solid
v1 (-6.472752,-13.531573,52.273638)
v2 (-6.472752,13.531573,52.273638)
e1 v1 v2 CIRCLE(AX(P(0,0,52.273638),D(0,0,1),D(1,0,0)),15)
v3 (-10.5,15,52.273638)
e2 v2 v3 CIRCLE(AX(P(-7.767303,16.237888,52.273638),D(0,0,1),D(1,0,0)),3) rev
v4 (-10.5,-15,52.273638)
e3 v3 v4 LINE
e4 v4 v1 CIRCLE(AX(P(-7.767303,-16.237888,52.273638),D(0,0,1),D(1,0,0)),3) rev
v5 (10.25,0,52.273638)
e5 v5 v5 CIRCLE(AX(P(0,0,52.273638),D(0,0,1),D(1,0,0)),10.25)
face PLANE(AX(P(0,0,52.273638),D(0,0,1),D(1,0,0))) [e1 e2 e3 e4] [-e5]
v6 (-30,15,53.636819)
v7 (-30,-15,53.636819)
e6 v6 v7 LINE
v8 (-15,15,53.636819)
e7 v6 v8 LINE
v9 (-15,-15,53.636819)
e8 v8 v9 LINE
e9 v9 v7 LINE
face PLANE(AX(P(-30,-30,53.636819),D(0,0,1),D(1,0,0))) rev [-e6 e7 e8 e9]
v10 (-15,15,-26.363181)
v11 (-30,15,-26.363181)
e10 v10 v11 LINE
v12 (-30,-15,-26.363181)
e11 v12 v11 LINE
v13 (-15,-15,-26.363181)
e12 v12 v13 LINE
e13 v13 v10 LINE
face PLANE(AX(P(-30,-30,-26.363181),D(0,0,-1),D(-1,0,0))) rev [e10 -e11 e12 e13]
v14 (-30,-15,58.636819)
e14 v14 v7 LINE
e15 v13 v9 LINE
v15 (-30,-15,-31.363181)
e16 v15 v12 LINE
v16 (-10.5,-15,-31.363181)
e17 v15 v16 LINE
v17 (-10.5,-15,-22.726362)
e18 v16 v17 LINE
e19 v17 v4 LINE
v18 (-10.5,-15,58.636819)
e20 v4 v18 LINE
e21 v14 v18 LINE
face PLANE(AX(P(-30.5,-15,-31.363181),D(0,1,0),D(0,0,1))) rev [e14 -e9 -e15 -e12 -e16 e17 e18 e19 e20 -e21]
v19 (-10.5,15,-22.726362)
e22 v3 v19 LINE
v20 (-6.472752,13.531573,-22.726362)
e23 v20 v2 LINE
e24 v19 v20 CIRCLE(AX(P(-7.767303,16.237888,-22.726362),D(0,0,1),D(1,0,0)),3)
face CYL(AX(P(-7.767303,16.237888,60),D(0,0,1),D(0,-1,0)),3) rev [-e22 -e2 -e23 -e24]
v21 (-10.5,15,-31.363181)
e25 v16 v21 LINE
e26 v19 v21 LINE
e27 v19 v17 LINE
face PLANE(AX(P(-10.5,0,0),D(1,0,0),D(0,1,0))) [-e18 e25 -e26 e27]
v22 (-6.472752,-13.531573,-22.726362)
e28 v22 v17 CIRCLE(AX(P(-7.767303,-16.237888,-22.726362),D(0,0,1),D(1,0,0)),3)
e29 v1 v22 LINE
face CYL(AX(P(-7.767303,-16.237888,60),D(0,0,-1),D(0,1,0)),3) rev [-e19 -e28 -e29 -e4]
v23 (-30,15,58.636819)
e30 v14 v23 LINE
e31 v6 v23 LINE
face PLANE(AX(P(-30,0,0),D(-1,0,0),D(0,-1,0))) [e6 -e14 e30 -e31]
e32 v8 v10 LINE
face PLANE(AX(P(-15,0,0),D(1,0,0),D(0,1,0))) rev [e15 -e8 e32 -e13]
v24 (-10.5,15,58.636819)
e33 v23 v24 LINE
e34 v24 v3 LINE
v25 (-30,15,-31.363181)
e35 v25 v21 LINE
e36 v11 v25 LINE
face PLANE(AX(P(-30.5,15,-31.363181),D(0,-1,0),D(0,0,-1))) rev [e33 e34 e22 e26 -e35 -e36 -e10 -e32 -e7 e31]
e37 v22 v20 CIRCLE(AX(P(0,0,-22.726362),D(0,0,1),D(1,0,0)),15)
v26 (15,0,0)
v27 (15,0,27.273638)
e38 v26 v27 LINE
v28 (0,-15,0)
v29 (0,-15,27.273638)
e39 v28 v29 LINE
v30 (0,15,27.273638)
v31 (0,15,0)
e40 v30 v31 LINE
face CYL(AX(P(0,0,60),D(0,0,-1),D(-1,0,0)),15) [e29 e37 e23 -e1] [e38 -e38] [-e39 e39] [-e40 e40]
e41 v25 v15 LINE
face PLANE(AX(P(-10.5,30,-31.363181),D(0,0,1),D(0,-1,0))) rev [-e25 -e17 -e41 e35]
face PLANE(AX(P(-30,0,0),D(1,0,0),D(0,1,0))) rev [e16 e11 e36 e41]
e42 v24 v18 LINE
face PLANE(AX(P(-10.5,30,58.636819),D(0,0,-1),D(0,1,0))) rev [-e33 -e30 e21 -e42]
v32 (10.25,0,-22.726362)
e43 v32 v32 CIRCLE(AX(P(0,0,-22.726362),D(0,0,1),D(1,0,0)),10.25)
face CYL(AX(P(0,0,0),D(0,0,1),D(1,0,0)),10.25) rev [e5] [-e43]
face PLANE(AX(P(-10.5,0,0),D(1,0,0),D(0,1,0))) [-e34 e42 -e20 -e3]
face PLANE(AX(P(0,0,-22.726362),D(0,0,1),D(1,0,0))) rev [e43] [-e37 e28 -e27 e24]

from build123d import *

# Parameters (mm, degrees)
SKETCH_1_W            = 30
SKETCH_1_H            = 30
SKETCH_1_R            = 9.807439468
EXTRUDE_1_DEPTH       = 60
SKETCH_2_W            = 30
SKETCH_2_H            = 30
SKETCH_2_R            = 10.25
EXTRUDE_2_DEPTH       = 50
SKETCH_6_R            = 10.25
CUT_EXTRUDE_1_DEPTH   = 60
SKETCH_7_W            = 30
SKETCH_7_H            = 30
SKETCH_7_R            = 10.25
REVOLVE_1_ANGLE       = 90
FILLET_2_R            = 15
SKETCH_9_W            = 65.452723958
SKETCH_9_H            = 141.93468868
CUT_EXTRUDE_3_DEPTH   = 30
SKETCH_19_W           = 90
SKETCH_19_H           = 60
EXTRUDE_9_DEPTH       = 4.5
SKETCH_20_W           = 5
SKETCH_20_H           = 60
EXTRUDE_10_DEPTH      = 15
EXTRUDE_11_DEPTH      = 25
EXTRUDE_11_DEPTH_BACK = 50
SKETCH_22_R           = 15
SKETCH_22_R_2         = 10.25
SKETCH_26_W           = 90
SKETCH_26_H           = 15
CUT_EXTRUDE_4_DEPTH   = 20
FILLET_4_R            = 3


with BuildPart() as part:
    # 스케치1 → 보스-돌출1 (new body)
    with BuildSketch(Plane.XY):
        Rectangle(SKETCH_1_W, SKETCH_1_H)
        Circle(SKETCH_1_R, mode=Mode.SUBTRACT)
    extrude(amount=EXTRUDE_1_DEPTH)

    # 스케치6 → 컷-돌출1 (cut)
    with BuildSketch(Plane.XY.offset(60)):
        Circle(SKETCH_6_R)
    extrude(amount=-CUT_EXTRUDE_1_DEPTH, mode=Mode.SUBTRACT)



with BuildPart() as body_2:
    # 스케치2 → 보스-돌출2 (new body)
    with BuildSketch(Plane.XZ.offset(15)):
        with Locations((0, 75)):
            Rectangle(SKETCH_2_W, SKETCH_2_H)
        with Locations((0, 75)):
            Circle(SKETCH_2_R, mode=Mode.SUBTRACT)
    extrude(amount=EXTRUDE_2_DEPTH)


with BuildPart() as part_1:
    add(part.part)

    add(body_2.part)  # 회전1 merges body 2
    # 스케치7 → 회전1 (revolve)
    with BuildSketch(Plane(origin=(0, -15, 0), x_dir=(1, 0, 0), z_dir=(0, 1, 0))):
        with Locations((0, -75)):
            Rectangle(SKETCH_7_W, SKETCH_7_H)
        with Locations(Location((0, -75, 0), (0, 0, 270))):
            Circle(SKETCH_7_R, mode=Mode.SUBTRACT)
    revolve(axis=Axis((15, -15, 60), (-1, 0, 0)), revolution_arc=REVOLVE_1_ANGLE)

    # 필렛2
    # the kernel refuses this fillet: 15 mm, written as the material it adds along each edge
    with BuildSketch(Plane(origin=(15, -15, 60), x_dir=(0, 0, -1), z_dir=(-1, 0, 0))) as fillet_2_piece_1:
        with BuildLine():
            CenterArc((FILLET_2_R, FILLET_2_R), FILLET_2_R, 180, 90)
            Line((0, FILLET_2_R), (0, 0))
            Line((0, 0), (FILLET_2_R, 0))
        make_face()
    extrude(amount=30)
    # the kernel refuses this fillet: 15 mm, written as the material it takes off along each edge
    with BuildSketch(Plane(origin=(15, -15, 60), x_dir=(0, 0, 1), z_dir=(0, -1, 0))) as fillet_2_2_piece_1:
        with BuildLine():
            CenterArc((30 - FILLET_2_R, FILLET_2_R), FILLET_2_R, 270, 90)
            Line((30, FILLET_2_R), (30, 0))
            Line((30, 0), (30 - FILLET_2_R, 0))
        make_face()
    revolve(axis=Axis((15, -15, 60), (-1, 0, 0)), revolution_arc=90, mode=Mode.SUBTRACT)
    with BuildSketch(Plane(origin=(-15, -15, 60), x_dir=(0, 0, 1), z_dir=(0, -1, 0))) as fillet_2_2_piece_2:
        with BuildLine():
            CenterArc((30 - FILLET_2_R, -FILLET_2_R), FILLET_2_R, 0, 90)
            Line((30, -FILLET_2_R), (30, 0))
            Line((30, 0), (30 - FILLET_2_R, 0))
        make_face()
    revolve(axis=Axis((-15, -15, 60), (-1, 0, 0)), revolution_arc=90, mode=Mode.SUBTRACT)
    with BuildSketch(Plane(origin=(-15, 15, -37.5), x_dir=(0, -1, 0), z_dir=(0, 0, 1))) as fillet_2_2_piece_3:
        with BuildLine():
            CenterArc((FILLET_2_R, FILLET_2_R), FILLET_2_R, 180, 90)
            Line((0, FILLET_2_R), (0, 0))
            Line((0, 0), (FILLET_2_R, 0))
        make_face()
    extrude(amount=97.5, mode=Mode.SUBTRACT)
    with BuildSketch(Plane(origin=(15, 15, -37.5), x_dir=(0, -1, 0), z_dir=(0, 0, 1))) as fillet_2_2_piece_4:
        with BuildLine():
            CenterArc((FILLET_2_R, -FILLET_2_R), FILLET_2_R, 90, 90)
            Line((0, -FILLET_2_R), (0, 0))
            Line((0, 0), (FILLET_2_R, 0))
        make_face()
    extrude(amount=97.5, mode=Mode.SUBTRACT)
    with BuildSketch(Plane(origin=(-15, -15, 90), x_dir=(0, 0, -1), z_dir=(0, -1, 0))) as fillet_2_2_piece_5:
        with BuildLine():
            CenterArc((FILLET_2_R, FILLET_2_R), FILLET_2_R, 180, 90)
            Line((0, FILLET_2_R), (0, 0))
            Line((0, 0), (FILLET_2_R, 0))
        make_face()
    extrude(amount=87.5, mode=Mode.SUBTRACT)
    with BuildSketch(Plane(origin=(15, -15, 90), x_dir=(0, 0, -1), z_dir=(0, -1, 0))) as fillet_2_2_piece_6:
        with BuildLine():
            CenterArc((FILLET_2_R, -FILLET_2_R), FILLET_2_R, 90, 90)
            Line((0, -FILLET_2_R), (0, 0))
            Line((0, 0), (FILLET_2_R, 0))
        make_face()
    extrude(amount=87.5, mode=Mode.SUBTRACT)
    # the kernel refuses this fillet: 15 mm, written as the material it takes off along each edge
    with BuildSketch(Plane(origin=(-15, -15, 45), x_dir=(1, 0, 0), z_dir=(0, 0, -1)), Plane(origin=(15, -15, -37.5), x_dir=(-1, 0, 0), z_dir=(0, 0, 1))) as fillet_2_3_piece_1:
        with BuildLine():
            CenterArc((FILLET_2_R, -FILLET_2_R), FILLET_2_R, 90, 90)
            Line((0, -FILLET_2_R), (0, 0))
            Line((0, 0), (FILLET_2_R, 0))
        make_face()
    extrude(amount=82.5, mode=Mode.SUBTRACT)
    with BuildSketch(Plane(origin=(15, -30, 60), x_dir=(0, 0, 1), z_dir=(0, -1, 0))) as fillet_2_3_piece_2:
        with BuildLine():
            CenterArc((FILLET_2_R, FILLET_2_R), FILLET_2_R, 180, 90)
            Line((0, FILLET_2_R), (0, 0))
            Line((0, 0), (FILLET_2_R, 0))
        make_face()
    extrude(amount=72.5, mode=Mode.SUBTRACT)
    with BuildSketch(Plane(origin=(-15, -30, 60), x_dir=(0, 0, 1), z_dir=(0, -1, 0))) as fillet_2_3_piece_3:
        with BuildLine():
            CenterArc((FILLET_2_R, -FILLET_2_R), FILLET_2_R, 90, 90)
            Line((0, -FILLET_2_R), (0, 0))
            Line((0, 0), (FILLET_2_R, 0))
        make_face()
    extrude(amount=72.5, mode=Mode.SUBTRACT)
    with BuildSketch(Plane(origin=(-15, -30, 45), x_dir=(0, 1, 0), z_dir=(0, 0, -1))) as fillet_2_3_piece_4:
        with BuildLine():
            CenterArc((15 + FILLET_2_R, FILLET_2_R), FILLET_2_R, 180, 90)
            Line((15, FILLET_2_R), (15, 0))
            Line((15, 0), (15 + FILLET_2_R, 0))
        make_face()
    revolve(axis=Axis((-15, -30, 45), (1, 0, 0)), revolution_arc=90, mode=Mode.SUBTRACT)
    with BuildSketch(Plane(origin=(15, -30, 45), x_dir=(0, 1, 0), z_dir=(0, 0, -1))) as fillet_2_3_piece_5:
        with BuildLine():
            CenterArc((15 + FILLET_2_R, -FILLET_2_R), FILLET_2_R, 90, 90)
            Line((15 + FILLET_2_R, 0), (15, 0))
            Line((15, 0), (15, -FILLET_2_R))
        make_face()
    revolve(axis=Axis((15, -30, 45), (1, 0, 0)), revolution_arc=90, mode=Mode.SUBTRACT)

    # 스케치9 → 컷-돌출3 (cut)
    with BuildSketch(Plane(origin=(15, 0, 0), x_dir=(0, 0, -1), z_dir=(1, 0, 0))):
        with Locations((-60, 0)):
            Rectangle(SKETCH_9_W, SKETCH_9_H)
    extrude(amount=-CUT_EXTRUDE_3_DEPTH, mode=Mode.SUBTRACT)

    # 스케치19 → 보스-돌출9 (add)
    with BuildSketch(Plane(origin=(-15, -15, 60), x_dir=(0, 0, -1), z_dir=(1, 0, 0))):
        with Locations((46.36318099, 15)):
            Rectangle(SKETCH_19_W, SKETCH_19_H)
    extrude(amount=EXTRUDE_9_DEPTH)

    # 스케치20 → 보스-돌출10 (add)
    with BuildSketch(Plane.ZY.offset(15)):
        with Locations((56.13681901, 0)):
            Rectangle(SKETCH_20_W, SKETCH_20_H)
        with Locations((-28.86318099, 0)):
            Rectangle(SKETCH_20_W, SKETCH_20_H)
    extrude(amount=EXTRUDE_10_DEPTH)

    # 스케치22 → 보스-돌출11 (add, two sides: drawn at the far end of the back side and taken through both)
    with BuildSketch(Plane.XY.offset(27.273638021).offset(-EXTRUDE_11_DEPTH_BACK)):
        Circle(SKETCH_22_R)
        Circle(SKETCH_22_R_2, mode=Mode.SUBTRACT)
    extrude(amount=EXTRUDE_11_DEPTH + EXTRUDE_11_DEPTH_BACK)

    # 스케치26 → 컷-돌출4 (cut)
    with BuildSketch(Plane(origin=(-10.5, 0, 0), x_dir=(0, 0, -1), z_dir=(1, 0, 0))):
        with Locations((-13.63681901, -22.5)):
            Rectangle(SKETCH_26_W, SKETCH_26_H)
        with Locations((-13.63681901, 22.5)):
            Rectangle(SKETCH_26_W, SKETCH_26_H)
    extrude(amount=-CUT_EXTRUDE_4_DEPTH, mode=Mode.SUBTRACT)

    # 필렛4
    # the kernel refuses this fillet: 3 mm, written as the material it adds along each edge
    with BuildSketch(Plane(origin=(-10.5, -10.712142643, 27.273638021), x_dir=(0.8191977687507059, -0.573511129511769, 0), z_dir=(0, 0, -1))) as fillet_4_piece_1:
        with BuildLine():
            CenterArc((5.4076958, 2.959446042), FILLET_4_R, 169.374679788, 91.193748437)
            Line((2.459133916, 3.51260318), (2.400162678, 3.523666322))
            ThreePointArc((2.400162678, 3.523666322), (1.180415092, 1.790712258), (-0.049151866, 0.034410668))
            Line((-0.049151866, 0.034410668), (0.009832174, -0.059188921))
            ThreePointArc((0.009832174, -0.059188921), (2.458043545, 0.142769789), (4.906254916, -0.059188921))
            Line((4.906254916, -0.059188921), (4.916087091, 0))
        make_face()
    extrude(amount=27.273638021)
    with BuildSketch(Plane(origin=(-10.5, 10.712142643, 27.273638021), x_dir=(0.8191977687507056, 0.5735111295117695, 0), z_dir=(0, 0, -1))) as fillet_4_piece_2:
        with BuildLine():
            CenterArc((5.4076958, -2.959446042), FILLET_4_R, 99.431571775, 91.193748437)
            Line((2.459133916, -3.51260318), (2.400162678, -3.523666322))
            ThreePointArc((2.400162678, -3.523666322), (1.180415092, -1.790712258), (-0.049151866, -0.034410668))
            Line((-0.049151866, -0.034410668), (0.009832174, 0.059188921))
            ThreePointArc((0.009832174, 0.059188921), (2.458043545, -0.142769789), (4.906254916, 0.059188921))
            Line((4.906254916, 0.059188921), (4.916087091, 0))
        make_face()
    extrude(amount=27.273638021)
    with BuildSketch(Plane(origin=(-10.5, 10.712142643, 52.273638021), x_dir=(0, 1, 0), z_dir=(0, 0, -1))) as fillet_4_piece_3:
        with BuildLine():
            CenterArc((5.525745321, 2.732697091), FILLET_4_R, 154.43613955, 91.193748437)
            Line((2.81943066, 4.027247576), (2.765304367, 4.053138585))
            ThreePointArc((2.765304367, 4.053138585), (1.526672022, 1.931743725), (-0.042848571, 0.042))
            Line((-0.042848571, 0.042), (0, -0.06))
            ThreePointArc((0, -0.06), (2.143928679, -0.06), (4.263099598, -0.054653942))
            Line((4.263099598, -0.054653942), (4.287857357, 0))
        make_face()
    extrude(amount=25)
    with BuildSketch(Plane(origin=(-10.5, 10.712142643, -22.726361979), x_dir=(0, 1, 0), z_dir=(0, 0, 1))) as fillet_4_piece_4:
        with BuildLine():
            CenterArc((5.525745321, -2.732697091), FILLET_4_R, 114.370112013, 91.193748437)
            Line((2.81943066, -4.027247576), (2.765304367, -4.053138585))
            ThreePointArc((2.765304367, -4.053138585), (1.526672022, -1.931743725), (-0.042848571, -0.042))
            Line((-0.042848571, -0.042), (0, 0.06))
            ThreePointArc((0, 0.06), (2.143928679, 0.06), (4.263099598, 0.054653942))
            Line((4.263099598, 0.054653942), (4.287857357, 0))
        make_face()
    extrude(amount=22.726361979)
    with BuildSketch(Plane(origin=(-10.5, -10.712142643, 52.273638021), x_dir=(0.8191977687507062, -0.5735111295117684, 0), z_dir=(0, 0, -1))) as fillet_4_piece_5:
        with BuildLine():
            CenterArc((5.4076958, 2.959446042), FILLET_4_R, 169.374679788, 91.193748437)
            Line((2.459133916, 3.51260318), (2.400162678, 3.523666322))
            ThreePointArc((2.400162678, 3.523666322), (1.180415092, 1.790712258), (-0.049151866, 0.034410668))
            Line((-0.049151866, 0.034410668), (0.009832174, -0.059188921))
            ThreePointArc((0.009832174, -0.059188921), (2.458043545, 0.142769789), (4.906254916, -0.059188921))
            Line((4.906254916, -0.059188921), (4.916087091, 0))
        make_face()
    extrude(amount=25)
    with BuildSketch(Plane(origin=(-10.5, -10.712142643, -22.726361979), x_dir=(0.8191977687507059, -0.5735111295117687, 0), z_dir=(0, 0, 1))) as fillet_4_piece_6:
        with BuildLine():
            CenterArc((5.4076958, -2.959446042), FILLET_4_R, 99.431571775, 91.193748437)
            Line((2.459133916, -3.51260318), (2.400162678, -3.523666322))
            ThreePointArc((2.400162678, -3.523666322), (1.180415092, -1.790712258), (-0.049151866, -0.034410668))
            Line((-0.049151866, -0.034410668), (0.009832174, 0.059188921))
            ThreePointArc((0.009832174, 0.059188921), (2.458043545, -0.142769789), (4.906254916, 0.059188921))
            Line((4.906254916, 0.059188921), (4.916087091, 0))
        make_face()
    extrude(amount=22.726361979)


solid = part_1.part
